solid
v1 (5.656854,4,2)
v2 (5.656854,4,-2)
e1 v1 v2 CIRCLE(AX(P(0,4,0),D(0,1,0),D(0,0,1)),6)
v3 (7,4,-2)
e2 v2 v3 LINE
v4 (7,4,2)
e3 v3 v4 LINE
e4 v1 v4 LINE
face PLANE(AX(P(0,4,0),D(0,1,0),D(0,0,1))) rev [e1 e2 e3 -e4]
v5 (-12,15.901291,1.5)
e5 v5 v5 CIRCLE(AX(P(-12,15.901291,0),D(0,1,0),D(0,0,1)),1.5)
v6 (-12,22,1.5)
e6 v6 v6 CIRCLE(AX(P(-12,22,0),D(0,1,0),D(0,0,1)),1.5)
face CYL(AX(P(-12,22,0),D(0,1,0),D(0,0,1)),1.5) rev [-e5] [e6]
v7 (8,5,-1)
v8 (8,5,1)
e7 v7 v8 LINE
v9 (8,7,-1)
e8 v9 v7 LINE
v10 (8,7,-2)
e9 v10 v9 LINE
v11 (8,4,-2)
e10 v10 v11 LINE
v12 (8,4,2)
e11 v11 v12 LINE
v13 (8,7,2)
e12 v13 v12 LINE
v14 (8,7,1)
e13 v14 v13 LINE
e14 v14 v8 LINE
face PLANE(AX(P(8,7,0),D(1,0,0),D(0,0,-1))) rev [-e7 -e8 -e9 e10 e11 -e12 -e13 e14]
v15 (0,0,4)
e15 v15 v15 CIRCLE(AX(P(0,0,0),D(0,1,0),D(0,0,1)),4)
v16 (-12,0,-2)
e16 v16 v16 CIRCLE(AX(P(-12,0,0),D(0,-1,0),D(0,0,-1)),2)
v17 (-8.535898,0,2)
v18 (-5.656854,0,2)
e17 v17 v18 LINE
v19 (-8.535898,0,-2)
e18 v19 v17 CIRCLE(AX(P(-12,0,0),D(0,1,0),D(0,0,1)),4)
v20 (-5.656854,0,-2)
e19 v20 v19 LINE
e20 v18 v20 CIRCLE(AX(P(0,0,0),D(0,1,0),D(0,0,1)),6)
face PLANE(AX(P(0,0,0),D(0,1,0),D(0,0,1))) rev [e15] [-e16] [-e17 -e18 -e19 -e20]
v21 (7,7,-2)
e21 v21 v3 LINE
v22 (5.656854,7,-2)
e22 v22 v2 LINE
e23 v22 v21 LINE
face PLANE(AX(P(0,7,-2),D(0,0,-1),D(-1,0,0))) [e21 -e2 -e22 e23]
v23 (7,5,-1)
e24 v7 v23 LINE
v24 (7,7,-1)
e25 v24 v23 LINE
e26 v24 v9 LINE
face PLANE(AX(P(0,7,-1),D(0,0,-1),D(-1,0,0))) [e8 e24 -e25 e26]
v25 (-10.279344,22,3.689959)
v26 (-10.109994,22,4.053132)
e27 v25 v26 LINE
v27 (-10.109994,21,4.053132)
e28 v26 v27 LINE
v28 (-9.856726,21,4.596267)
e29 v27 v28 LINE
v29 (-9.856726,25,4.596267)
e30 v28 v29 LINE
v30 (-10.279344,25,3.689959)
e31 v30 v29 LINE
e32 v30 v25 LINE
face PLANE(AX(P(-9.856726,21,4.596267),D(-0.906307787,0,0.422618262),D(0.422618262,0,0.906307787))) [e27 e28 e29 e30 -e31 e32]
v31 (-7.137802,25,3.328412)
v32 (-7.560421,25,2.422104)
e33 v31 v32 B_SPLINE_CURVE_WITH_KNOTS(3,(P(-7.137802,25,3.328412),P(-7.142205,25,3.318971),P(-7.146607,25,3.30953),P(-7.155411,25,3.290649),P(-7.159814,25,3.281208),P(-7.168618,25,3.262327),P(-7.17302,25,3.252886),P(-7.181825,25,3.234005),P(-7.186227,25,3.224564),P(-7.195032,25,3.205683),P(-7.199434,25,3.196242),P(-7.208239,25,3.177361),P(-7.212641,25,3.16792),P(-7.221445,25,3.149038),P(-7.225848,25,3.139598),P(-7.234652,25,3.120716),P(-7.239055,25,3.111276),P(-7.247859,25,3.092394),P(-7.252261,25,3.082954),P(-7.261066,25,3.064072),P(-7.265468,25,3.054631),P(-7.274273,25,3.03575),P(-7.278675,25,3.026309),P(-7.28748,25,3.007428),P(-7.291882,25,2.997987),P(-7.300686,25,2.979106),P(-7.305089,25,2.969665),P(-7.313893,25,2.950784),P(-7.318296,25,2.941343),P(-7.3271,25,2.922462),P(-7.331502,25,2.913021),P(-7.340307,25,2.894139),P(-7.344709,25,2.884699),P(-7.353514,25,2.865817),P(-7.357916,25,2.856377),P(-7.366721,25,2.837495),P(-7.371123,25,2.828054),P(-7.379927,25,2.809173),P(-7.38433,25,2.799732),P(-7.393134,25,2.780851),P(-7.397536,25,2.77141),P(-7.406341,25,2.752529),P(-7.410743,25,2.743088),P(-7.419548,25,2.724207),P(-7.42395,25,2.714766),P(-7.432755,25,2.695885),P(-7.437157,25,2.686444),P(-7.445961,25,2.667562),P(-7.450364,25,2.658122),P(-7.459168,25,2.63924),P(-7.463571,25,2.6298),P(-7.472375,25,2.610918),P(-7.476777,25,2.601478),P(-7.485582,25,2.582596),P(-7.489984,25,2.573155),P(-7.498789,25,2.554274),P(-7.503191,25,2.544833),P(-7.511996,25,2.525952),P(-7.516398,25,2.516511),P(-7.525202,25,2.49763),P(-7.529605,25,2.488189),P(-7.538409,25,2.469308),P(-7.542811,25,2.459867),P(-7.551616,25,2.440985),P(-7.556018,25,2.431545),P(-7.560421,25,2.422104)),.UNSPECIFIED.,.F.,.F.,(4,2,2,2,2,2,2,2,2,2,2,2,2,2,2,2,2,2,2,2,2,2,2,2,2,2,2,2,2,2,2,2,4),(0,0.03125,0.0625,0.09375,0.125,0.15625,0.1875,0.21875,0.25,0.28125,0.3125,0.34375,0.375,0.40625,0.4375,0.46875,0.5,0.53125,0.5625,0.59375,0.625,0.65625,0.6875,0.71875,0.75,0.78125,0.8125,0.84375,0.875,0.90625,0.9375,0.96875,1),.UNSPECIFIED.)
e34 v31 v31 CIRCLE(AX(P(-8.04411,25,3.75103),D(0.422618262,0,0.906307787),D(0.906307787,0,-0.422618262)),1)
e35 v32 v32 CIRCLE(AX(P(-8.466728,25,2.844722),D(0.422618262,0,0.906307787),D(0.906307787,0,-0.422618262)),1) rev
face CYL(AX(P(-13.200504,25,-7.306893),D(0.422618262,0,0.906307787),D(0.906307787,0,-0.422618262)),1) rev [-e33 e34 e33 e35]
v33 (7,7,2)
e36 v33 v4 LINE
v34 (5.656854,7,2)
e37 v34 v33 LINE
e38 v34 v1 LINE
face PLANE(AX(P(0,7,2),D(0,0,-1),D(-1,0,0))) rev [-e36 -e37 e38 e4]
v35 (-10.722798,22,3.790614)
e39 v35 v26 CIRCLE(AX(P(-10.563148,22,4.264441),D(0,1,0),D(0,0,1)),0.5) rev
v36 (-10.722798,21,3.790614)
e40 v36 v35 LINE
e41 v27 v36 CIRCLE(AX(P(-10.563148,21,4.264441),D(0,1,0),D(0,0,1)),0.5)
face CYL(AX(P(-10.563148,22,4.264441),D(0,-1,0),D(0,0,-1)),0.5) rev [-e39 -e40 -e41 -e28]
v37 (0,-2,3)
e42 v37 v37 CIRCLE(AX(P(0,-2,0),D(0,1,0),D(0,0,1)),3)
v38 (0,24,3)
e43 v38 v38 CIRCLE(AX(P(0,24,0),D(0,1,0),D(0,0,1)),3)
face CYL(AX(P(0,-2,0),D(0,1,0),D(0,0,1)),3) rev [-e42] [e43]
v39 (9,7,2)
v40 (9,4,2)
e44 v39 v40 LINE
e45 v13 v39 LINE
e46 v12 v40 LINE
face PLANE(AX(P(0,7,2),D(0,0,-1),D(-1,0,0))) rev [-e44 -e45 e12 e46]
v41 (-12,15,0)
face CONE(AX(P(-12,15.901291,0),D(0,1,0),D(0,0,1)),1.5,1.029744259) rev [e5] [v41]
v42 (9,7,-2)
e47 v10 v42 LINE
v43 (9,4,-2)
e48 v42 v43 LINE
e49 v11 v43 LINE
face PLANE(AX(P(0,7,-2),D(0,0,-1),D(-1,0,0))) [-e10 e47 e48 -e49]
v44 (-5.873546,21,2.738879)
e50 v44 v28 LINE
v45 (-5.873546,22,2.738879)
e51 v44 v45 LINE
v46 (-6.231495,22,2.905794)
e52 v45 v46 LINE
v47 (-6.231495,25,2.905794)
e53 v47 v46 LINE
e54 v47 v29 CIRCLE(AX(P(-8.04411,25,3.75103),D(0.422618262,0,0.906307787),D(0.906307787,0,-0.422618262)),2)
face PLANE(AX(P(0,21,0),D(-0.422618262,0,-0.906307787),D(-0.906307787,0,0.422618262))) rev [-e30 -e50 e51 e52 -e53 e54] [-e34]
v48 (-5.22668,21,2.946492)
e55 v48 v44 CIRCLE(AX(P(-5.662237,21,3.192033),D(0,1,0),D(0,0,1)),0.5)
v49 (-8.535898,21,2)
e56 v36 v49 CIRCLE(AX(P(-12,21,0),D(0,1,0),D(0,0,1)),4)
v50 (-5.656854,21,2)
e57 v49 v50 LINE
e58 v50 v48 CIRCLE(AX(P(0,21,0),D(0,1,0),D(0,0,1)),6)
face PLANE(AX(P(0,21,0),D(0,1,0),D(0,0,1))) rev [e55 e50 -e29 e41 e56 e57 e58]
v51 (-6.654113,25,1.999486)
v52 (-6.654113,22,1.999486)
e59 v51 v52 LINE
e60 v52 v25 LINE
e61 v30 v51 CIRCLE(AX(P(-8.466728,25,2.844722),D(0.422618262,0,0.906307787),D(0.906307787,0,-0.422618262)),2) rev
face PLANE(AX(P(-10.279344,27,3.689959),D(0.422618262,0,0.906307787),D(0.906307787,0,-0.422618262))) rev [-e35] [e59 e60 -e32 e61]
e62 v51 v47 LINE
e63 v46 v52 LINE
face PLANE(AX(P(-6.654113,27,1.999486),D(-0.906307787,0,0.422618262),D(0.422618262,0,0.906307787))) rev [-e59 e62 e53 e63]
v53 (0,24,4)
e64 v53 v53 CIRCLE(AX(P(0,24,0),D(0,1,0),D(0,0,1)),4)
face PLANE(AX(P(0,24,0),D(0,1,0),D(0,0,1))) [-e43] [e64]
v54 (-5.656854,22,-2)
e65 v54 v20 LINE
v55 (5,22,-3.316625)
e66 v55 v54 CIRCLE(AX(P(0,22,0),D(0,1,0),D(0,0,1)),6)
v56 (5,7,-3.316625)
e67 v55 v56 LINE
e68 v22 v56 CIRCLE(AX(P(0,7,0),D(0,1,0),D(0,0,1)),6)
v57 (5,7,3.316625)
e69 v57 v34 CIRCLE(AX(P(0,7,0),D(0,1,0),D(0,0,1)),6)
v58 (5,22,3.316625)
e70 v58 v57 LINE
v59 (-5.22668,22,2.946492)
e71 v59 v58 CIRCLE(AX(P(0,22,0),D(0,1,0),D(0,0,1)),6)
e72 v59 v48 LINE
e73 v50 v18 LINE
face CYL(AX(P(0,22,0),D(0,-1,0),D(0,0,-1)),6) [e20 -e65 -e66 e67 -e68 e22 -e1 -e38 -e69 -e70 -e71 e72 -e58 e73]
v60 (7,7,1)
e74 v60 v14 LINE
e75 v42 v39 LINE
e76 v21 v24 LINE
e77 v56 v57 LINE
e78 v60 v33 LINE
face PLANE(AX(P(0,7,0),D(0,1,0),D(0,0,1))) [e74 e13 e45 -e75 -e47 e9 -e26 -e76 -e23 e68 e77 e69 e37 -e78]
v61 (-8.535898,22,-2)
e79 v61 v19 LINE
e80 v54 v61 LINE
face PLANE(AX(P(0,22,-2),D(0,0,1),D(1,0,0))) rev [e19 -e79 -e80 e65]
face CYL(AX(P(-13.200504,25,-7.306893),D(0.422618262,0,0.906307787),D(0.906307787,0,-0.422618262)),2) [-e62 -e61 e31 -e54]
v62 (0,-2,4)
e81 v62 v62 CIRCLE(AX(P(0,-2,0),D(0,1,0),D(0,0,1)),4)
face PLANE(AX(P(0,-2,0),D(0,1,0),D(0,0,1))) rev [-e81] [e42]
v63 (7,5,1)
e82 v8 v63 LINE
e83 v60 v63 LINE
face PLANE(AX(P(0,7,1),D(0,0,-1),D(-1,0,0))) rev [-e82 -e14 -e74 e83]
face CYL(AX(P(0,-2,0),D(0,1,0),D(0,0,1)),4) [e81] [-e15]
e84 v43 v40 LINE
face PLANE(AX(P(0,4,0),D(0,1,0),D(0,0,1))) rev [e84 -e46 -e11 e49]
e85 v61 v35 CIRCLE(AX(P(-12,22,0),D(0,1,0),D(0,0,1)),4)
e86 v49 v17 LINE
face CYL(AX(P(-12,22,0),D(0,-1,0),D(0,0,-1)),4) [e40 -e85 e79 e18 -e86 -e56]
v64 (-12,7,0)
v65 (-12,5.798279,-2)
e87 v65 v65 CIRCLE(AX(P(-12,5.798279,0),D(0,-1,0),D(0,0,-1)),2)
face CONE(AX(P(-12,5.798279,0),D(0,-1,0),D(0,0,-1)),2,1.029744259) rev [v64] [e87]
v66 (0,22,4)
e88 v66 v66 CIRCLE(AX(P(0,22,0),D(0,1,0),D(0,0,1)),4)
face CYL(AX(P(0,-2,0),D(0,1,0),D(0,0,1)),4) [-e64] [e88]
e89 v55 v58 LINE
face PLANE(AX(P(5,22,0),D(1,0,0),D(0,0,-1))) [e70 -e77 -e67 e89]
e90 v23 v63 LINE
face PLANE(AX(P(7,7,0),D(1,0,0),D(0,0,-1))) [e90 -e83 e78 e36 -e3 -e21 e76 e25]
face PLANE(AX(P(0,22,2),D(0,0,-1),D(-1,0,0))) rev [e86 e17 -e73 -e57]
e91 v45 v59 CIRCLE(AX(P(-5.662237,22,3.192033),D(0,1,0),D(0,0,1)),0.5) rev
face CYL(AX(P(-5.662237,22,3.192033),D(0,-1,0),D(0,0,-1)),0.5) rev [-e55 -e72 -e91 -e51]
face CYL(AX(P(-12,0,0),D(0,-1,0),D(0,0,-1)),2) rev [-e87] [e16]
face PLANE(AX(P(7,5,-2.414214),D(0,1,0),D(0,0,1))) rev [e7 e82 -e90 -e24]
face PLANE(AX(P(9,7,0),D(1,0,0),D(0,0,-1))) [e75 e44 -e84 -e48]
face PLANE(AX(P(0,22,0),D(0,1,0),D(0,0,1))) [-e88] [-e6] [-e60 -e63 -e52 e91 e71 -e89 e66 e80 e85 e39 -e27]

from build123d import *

# Parameters (mm, degrees)
SKETCH1_R                 = 4
BOSS_EXTRUDE1_DEPTH       = 22
BOSS_EXTRUDE2_DEPTH       = 24
BOSS_EXTRUDE2_DEPTH_BACK  = 2
SKETCH1_3_R               = 4
SKETCH1_3_R_2             = 3
CUT_EXTRUDE1_DEPTH        = 18
BOSS_EXTRUDE3_DEPTH       = 3
SKETCH3_W                 = 1
SKETCH3_H                 = 1
CUT_EXTRUDE2_DEPTH        = 2
BOSS_EXTRUDE7_START       = -1
BOSS_EXTRUDE7_DEPTH       = 1
BOSS_EXTRUDE8_DEPTH       = 5
CUT_EXTRUDE8_REACH        = 33.953
SKETCH8_R                 = 1
FILLET1_R                 = 0.5
F_4_0MM_DOWEL_HOLE1_D     = 4
F_4_0MM_DOWEL_HOLE1_DEPTH = 5.798278762
F_4_0MM_DOWEL_HOLE1_TIP   = 1.201721238
F_3_0MM_DOWEL_HOLE1_D     = 3
F_3_0MM_DOWEL_HOLE1_DEPTH = 6.098709071
F_3_0MM_DOWEL_HOLE1_TIP   = 0.901290929


with BuildPart() as part:
    # Sketch1 → Boss-Extrude1 (new body)
    with BuildSketch(Plane(origin=(0, 0, 0), x_dir=(1, 0, 0), z_dir=(0, 1, 0))):
        with BuildLine():
            Line((-5.656854249, 2), (-8.535898385, 2))
            ThreePointArc((-8.535898385, 2), (-16, 0), (-8.535898385, -2))
            Line((-8.535898385, -2), (-5.656854249, -2))
            ThreePointArc((-5.656854249, -2), (6, 0), (-5.656854249, 2))
        make_face()
        with Locations(Location((0, 0, 0), (0, 0, 270))):
            Circle(SKETCH1_R, mode=Mode.SUBTRACT)
    extrude(amount=BOSS_EXTRUDE1_DEPTH)

    # Sketch1<3> → Boss-Extrude2 (add, two sides: drawn at the far end of the back side and taken through both)
    with BuildSketch(Plane(origin=(0, 0, 0), x_dir=(1, 0, 0), z_dir=(0, 1, 0)).offset(-BOSS_EXTRUDE2_DEPTH_BACK)):
        with Locations(Location((0, 0, 0), (0, 0, 270))):
            Circle(SKETCH1_3_R)
        with Locations(Location((0, 0, 0), (0, 0, 270))):
            Circle(SKETCH1_3_R_2, mode=Mode.SUBTRACT)
    extrude(amount=BOSS_EXTRUDE2_DEPTH + BOSS_EXTRUDE2_DEPTH_BACK)

    # Sketch2 → Cut-Extrude1 (cut)
    with BuildSketch(Plane(origin=(0, 4, 0), x_dir=(1, 0, 0), z_dir=(0, 1, 0))):
        with BuildLine():
            ThreePointArc((5.656854249, 2), (5.368939451, 2.678523692), (5, 3.31662479))
            Line((5, 3.31662479), (5, 0))
            Line((5, 0), (6, 0))
            ThreePointArc((6, 0), (5.913591358, 1.014611872), (5.656854249, 2))
        make_face()
        with BuildLine():
            Line((6, 0), (5, 0))
            Line((5, 0), (5, -3.31662479))
            ThreePointArc((5, -3.31662479), (5.368939451, -2.678523692), (5.656854249, -2))
            ThreePointArc((5.656854249, -2), (5.913591358, -1.014611872), (6, 0))
        make_face()
    extrude(amount=CUT_EXTRUDE1_DEPTH, mode=Mode.SUBTRACT)

    # Sketch2<3> → Boss-Extrude3 (add)
    with BuildSketch(Plane(origin=(0, 4, 0), x_dir=(1, 0, 0), z_dir=(0, 1, 0))):
        with BuildLine():
            Line((5, 3.31662479), (5, -3.31662479))
            ThreePointArc((5, -3.31662479), (5.368939451, -2.678523692), (5.656854249, -2))
            Line((5.656854249, -2), (7, -2))
            Line((7, -2), (7, -1))
            Line((7, -1), (8, -1))
            Line((8, -1), (8, -2))
            Line((8, -2), (9, -2))
            Line((9, -2), (9, 2))
            Line((9, 2), (8, 2))
            Line((8, 2), (8, 1))
            Line((8, 1), (7, 1))
            Line((7, 1), (7, 2))
            Line((7, 2), (5.656854249, 2))
            ThreePointArc((5.656854249, 2), (5.368939451, 2.678523692), (5, 3.31662479))
        make_face()
    extrude(amount=BOSS_EXTRUDE3_DEPTH)

    # Sketch3 → Cut-Extrude2 (cut)
    with BuildSketch(Plane.XY.offset(1)):
        with Locations((7.5, 4.5)):
            Rectangle(SKETCH3_W, SKETCH3_H)
    extrude(amount=-CUT_EXTRUDE2_DEPTH, mode=Mode.SUBTRACT)

    # Sketch6 → Boss-Extrude7 (add)
    with BuildSketch(Plane(origin=(0, 22, 0), x_dir=(1, 0, 0), z_dir=(0, 1, 0)).offset(BOSS_EXTRUDE7_START)):
        Polygon((-9.856725658, -4.596266659), (-6.232597162, -2.906307787), (-6.655215424, -2), (-10.27934392, -3.689958872), align=None)
        Polygon((-6.232597162, -2.906307787), (-5.412549479, -2.523913272), (-5.83516774, -1.617605485), (-6.655215424, -2), align=None)
        with BuildLine():
            Line((-10.27934392, -3.689958872), (-6.655215424, -2))
            Line((-6.655215424, -2), (-8.535898385, -2))
            ThreePointArc((-8.535898385, -2), (-9.29763917, -2.949109347), (-10.309526953, -3.625231148))
            Line((-10.309526953, -3.625231148), (-10.27934392, -3.689958872))
        make_face()
    extrude(amount=BOSS_EXTRUDE7_DEPTH)

    # Sketch7 → Boss-Extrude8 (add)
    with BuildSketch(Plane(origin=(0, 22, 0), x_dir=(1, 0, 0), z_dir=(0, 1, 0))):
        Polygon((-10.27934392, -3.689958872), (-6.654112772, -1.999485825), (-6.23149451, -2.905793612), (-9.856725658, -4.596266659), align=None)
    extrude(amount=BOSS_EXTRUDE8_DEPTH)

    # Sketch8 → Cut-Extrude8 (cut, up to next)
    with BuildSketch(Plane(origin=(0, 0, 0), x_dir=(0.9063077870366509, 0, -0.42261826174069733), z_dir=(0.42261826174069733, 0, 0.9063077870366509)), mode=Mode.PRIVATE) as cut_extrude8_sk1:
        with BuildLine():
            ThreePointArc((-10.875693444, 25), (-10.289907007, 26.414213562), (-8.875693444, 27))
            Line((-8.875693444, 27), (-10.875693444, 27))
            Line((-10.875693444, 27), (-10.875693444, 25))
        make_face()
    cut_extrude8_tool1 = extrude(cut_extrude8_sk1.sketch, amount=-CUT_EXTRUDE8_REACH, mode=Mode.PRIVATE) & part.part
    # Sketch8 → Cut-Extrude8 (cut, up to next)
    with BuildSketch(Plane(origin=(0, 0, 0), x_dir=(0.9063077870366509, 0, -0.42261826174069733), z_dir=(0.42261826174069733, 0, 0.9063077870366509)), mode=Mode.PRIVATE) as cut_extrude8_sk2:
        with BuildLine():
            ThreePointArc((-8.875693444, 27), (-7.461479882, 26.414213562), (-6.875693444, 25))
            Line((-6.875693444, 25), (-6.875693444, 27))
            Line((-6.875693444, 27), (-8.875693444, 27))
        make_face()
    cut_extrude8_tool2 = extrude(cut_extrude8_sk2.sketch, amount=-CUT_EXTRUDE8_REACH, mode=Mode.PRIVATE) & part.part
    # Sketch8 → Cut-Extrude8 (cut, up to next)
    with BuildSketch(Plane(origin=(0, 0, 0), x_dir=(0.9063077870366509, 0, -0.42261826174069733), z_dir=(0.42261826174069733, 0, 0.9063077870366509)), mode=Mode.PRIVATE) as cut_extrude8_sk3:
        with Locations((-8.875693444, 25)):
            Circle(SKETCH8_R)
    cut_extrude8_tool3 = extrude(cut_extrude8_sk3.sketch, amount=-CUT_EXTRUDE8_REACH, mode=Mode.PRIVATE) & part.part
    add(cut_extrude8_tool1.solids().sort_by_distance((-9.451845, 26.553264, 4.407468))[0], mode=Mode.SUBTRACT)
    add(cut_extrude8_tool2.solids().sort_by_distance((-6.636375, 26.553264, 3.094592))[0], mode=Mode.SUBTRACT)
    add(cut_extrude8_tool3.solids().sort_by_distance((-8.04411, 25, 3.75103))[0], mode=Mode.SUBTRACT)

    # Fillet1
    # the kernel refuses this fillet: 0.5 mm, written as the material it adds along each edge
    with BuildSketch(Plane(origin=(-5.437846722, 22, 2.53570957), x_dir=(0.4571889357830061, 0, 0.8893695952738672), z_dir=(0, -1, 0))) as fillet1_piece_1:
        with BuildLine():
            CenterArc((0.481125753, 0.499629492), FILLET1_R, 182.205862892, 85.588274215)
            Line((-0.018503738, 0.480384461), (0, 0))
            ThreePointArc((0, 0), (0.230940361, 0.004446102), (0.461880723, 0))
        make_face()
    extrude(amount=1)
    with BuildSketch(Plane(origin=(-10.309526953, 21, 3.625231148), x_dir=(-0.9284189548945215, 0, 0.3715349838071298), z_dir=(0, 1, 0))) as fillet1_piece_2:
        with BuildLine():
            CenterArc((0.472954925, 0.499225399), FILLET1_R, 183.189685104, 83.620629792)
            Line((-0.026270474, 0.471404521), (0, 0))
            ThreePointArc((0, 0), (0.222567024, 0.00619681), (0.445134047, 0))
        make_face()
    extrude(amount=1)

    # Ø4.0mm Dowel Hole1
    with Locations(Plane(origin=(0, 0, 0), x_dir=(-1, 0, 0), z_dir=(0, -1, 0))):
        with Locations((12, 0)):
            Hole(F_4_0MM_DOWEL_HOLE1_D / 2, depth=F_4_0MM_DOWEL_HOLE1_DEPTH)
            with Locations((0, 0, -(F_4_0MM_DOWEL_HOLE1_DEPTH + F_4_0MM_DOWEL_HOLE1_TIP / 2))):  # 118° drill point
                Cone(0, F_4_0MM_DOWEL_HOLE1_D / 2, F_4_0MM_DOWEL_HOLE1_TIP, mode=Mode.SUBTRACT)

    # Ø3.0mm Dowel Hole1
    with Locations(Plane(origin=(0, 22, 0), x_dir=(1, 0, 0), z_dir=(0, 1, 0))):
        with Locations((-12, 0)):
            Hole(F_3_0MM_DOWEL_HOLE1_D / 2, depth=F_3_0MM_DOWEL_HOLE1_DEPTH)
            with Locations((0, 0, -(F_3_0MM_DOWEL_HOLE1_DEPTH + F_3_0MM_DOWEL_HOLE1_TIP / 2))):  # 118° drill point
                Cone(0, F_3_0MM_DOWEL_HOLE1_D / 2, F_3_0MM_DOWEL_HOLE1_TIP, mode=Mode.SUBTRACT)


solid = part.part
